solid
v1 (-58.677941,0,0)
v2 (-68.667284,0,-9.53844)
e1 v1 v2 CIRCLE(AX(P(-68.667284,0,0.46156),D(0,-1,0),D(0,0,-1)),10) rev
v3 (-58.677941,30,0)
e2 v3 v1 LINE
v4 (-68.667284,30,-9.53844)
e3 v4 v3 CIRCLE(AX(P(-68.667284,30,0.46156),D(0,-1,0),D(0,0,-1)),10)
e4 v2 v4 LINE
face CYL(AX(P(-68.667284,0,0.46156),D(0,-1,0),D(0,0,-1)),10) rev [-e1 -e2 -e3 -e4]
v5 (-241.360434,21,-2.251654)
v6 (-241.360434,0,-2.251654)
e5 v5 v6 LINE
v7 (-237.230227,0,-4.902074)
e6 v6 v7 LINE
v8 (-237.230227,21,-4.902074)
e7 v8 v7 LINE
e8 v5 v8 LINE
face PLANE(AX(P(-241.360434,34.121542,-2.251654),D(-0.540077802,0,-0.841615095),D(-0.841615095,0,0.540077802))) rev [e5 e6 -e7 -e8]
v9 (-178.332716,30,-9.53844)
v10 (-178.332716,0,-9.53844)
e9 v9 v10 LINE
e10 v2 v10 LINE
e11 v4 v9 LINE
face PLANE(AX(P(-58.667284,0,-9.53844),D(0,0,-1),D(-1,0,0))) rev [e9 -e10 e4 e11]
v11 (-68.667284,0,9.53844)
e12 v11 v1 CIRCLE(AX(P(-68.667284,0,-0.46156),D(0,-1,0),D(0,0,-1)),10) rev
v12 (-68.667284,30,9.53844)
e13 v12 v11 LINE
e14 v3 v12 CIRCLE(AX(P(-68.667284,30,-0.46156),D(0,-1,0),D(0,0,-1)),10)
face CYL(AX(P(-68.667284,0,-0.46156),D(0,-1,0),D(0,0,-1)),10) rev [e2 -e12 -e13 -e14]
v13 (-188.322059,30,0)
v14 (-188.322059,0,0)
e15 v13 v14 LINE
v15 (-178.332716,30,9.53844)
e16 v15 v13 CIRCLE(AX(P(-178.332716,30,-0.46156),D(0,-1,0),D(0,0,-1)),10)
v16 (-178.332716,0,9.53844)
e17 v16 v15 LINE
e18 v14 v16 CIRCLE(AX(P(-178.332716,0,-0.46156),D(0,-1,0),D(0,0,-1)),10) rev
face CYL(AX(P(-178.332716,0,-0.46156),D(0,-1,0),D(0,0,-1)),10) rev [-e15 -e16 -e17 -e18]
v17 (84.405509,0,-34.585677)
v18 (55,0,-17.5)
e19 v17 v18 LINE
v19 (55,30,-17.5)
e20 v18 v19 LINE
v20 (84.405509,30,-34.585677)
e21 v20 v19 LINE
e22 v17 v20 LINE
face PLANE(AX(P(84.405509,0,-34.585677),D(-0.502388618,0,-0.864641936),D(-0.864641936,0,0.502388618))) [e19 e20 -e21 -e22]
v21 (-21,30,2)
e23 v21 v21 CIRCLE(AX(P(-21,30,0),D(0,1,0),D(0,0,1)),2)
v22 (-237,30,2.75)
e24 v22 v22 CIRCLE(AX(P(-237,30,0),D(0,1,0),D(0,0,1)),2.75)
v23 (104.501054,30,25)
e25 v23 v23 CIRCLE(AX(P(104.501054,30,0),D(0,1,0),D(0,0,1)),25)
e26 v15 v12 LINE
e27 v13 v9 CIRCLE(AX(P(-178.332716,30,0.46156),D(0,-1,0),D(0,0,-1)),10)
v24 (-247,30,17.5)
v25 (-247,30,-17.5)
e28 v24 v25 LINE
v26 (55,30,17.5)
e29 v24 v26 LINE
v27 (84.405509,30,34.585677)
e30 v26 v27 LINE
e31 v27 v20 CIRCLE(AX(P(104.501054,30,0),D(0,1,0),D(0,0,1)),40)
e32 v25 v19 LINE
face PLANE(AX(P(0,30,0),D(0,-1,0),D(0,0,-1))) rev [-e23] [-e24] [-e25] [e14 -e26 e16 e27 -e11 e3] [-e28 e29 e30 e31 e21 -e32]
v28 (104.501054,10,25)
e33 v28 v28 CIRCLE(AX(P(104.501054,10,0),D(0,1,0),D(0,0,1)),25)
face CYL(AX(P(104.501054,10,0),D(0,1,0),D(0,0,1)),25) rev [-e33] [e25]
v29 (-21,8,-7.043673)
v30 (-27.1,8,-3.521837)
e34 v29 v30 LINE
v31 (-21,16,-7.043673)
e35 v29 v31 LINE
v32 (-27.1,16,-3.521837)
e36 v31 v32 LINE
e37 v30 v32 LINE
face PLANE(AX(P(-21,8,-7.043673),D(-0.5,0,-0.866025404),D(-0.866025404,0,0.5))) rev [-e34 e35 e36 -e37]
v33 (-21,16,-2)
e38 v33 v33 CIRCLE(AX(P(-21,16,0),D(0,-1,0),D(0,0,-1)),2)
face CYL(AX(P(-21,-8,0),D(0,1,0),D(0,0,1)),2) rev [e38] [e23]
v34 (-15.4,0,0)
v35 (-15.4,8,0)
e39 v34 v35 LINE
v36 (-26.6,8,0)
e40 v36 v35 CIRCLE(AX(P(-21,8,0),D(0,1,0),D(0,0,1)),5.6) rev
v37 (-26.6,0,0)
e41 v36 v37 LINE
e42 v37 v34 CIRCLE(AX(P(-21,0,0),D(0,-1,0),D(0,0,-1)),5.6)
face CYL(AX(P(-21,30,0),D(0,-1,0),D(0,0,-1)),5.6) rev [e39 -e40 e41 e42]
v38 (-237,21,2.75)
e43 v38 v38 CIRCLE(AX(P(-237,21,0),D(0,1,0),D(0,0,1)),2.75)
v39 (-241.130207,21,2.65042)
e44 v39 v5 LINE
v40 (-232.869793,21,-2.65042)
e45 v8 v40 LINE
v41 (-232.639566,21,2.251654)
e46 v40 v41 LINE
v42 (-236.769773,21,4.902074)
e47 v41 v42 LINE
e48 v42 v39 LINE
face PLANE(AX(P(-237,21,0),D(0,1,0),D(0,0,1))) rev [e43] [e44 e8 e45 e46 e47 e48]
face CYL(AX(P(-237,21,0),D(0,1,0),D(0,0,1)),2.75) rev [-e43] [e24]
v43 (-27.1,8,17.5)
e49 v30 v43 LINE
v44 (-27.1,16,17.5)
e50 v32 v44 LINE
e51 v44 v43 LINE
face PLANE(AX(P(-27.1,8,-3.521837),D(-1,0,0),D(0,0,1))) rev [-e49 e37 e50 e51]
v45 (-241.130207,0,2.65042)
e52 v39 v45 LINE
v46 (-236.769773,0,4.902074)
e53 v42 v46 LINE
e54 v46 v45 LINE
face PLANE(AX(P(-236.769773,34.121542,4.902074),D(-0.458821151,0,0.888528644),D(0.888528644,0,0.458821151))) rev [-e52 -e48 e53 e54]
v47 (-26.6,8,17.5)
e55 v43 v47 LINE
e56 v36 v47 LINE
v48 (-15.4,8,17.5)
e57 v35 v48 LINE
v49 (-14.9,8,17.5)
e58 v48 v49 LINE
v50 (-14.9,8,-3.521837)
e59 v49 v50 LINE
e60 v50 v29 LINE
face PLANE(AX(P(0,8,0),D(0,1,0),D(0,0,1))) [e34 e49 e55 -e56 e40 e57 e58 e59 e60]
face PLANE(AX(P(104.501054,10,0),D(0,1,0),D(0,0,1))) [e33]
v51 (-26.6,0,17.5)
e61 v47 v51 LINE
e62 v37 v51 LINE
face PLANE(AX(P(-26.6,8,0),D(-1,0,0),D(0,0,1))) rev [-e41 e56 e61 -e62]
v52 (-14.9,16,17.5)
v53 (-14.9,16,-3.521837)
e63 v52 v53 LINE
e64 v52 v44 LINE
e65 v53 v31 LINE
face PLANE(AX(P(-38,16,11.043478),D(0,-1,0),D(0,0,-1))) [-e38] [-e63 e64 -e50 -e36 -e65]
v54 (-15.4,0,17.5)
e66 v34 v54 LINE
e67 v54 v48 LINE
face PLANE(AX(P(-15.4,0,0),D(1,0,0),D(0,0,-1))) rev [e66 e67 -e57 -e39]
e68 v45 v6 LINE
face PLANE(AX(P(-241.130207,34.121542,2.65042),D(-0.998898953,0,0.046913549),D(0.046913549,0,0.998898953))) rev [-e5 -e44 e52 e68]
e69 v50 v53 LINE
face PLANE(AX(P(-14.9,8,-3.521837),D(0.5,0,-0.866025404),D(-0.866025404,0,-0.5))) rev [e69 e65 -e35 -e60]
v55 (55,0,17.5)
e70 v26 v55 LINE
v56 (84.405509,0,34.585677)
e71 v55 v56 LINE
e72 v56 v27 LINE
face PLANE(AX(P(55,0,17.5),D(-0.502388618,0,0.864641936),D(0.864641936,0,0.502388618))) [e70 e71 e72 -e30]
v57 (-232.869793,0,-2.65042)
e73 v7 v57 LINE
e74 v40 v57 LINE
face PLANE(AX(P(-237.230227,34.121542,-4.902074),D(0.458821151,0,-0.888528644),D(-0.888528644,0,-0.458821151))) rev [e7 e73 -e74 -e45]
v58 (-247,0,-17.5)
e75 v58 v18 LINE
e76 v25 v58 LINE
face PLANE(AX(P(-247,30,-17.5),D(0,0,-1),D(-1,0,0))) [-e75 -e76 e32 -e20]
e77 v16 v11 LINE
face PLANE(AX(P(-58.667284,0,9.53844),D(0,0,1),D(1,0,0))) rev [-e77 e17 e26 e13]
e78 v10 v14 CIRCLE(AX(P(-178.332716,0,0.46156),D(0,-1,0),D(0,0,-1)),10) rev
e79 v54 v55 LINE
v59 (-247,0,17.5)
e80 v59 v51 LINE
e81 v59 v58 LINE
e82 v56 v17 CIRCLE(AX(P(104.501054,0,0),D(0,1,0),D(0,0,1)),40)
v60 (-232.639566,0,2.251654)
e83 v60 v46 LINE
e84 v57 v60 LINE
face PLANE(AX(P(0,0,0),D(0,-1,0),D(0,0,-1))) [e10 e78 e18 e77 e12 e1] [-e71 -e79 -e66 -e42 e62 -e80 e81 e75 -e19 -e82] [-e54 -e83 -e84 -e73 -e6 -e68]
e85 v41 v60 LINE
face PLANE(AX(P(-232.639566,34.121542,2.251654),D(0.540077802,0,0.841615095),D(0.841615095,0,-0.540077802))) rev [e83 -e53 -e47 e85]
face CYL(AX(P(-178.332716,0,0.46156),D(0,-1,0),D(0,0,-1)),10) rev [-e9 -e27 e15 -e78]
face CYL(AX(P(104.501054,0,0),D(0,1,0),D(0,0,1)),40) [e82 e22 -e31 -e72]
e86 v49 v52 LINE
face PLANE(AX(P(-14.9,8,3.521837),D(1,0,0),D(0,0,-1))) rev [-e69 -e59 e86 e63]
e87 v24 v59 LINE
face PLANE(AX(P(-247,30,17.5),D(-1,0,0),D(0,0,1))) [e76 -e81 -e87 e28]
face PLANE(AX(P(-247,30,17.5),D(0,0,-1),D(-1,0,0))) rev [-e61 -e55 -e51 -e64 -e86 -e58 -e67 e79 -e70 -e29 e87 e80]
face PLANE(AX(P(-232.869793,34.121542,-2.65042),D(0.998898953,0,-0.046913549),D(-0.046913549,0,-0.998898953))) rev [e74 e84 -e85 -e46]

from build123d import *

# Parameters (mm, degrees)
SKETCH2_W           = 247
SKETCH2_H           = 35
BOSS_EXTRUDE1_DEPTH = 30
SKETCH3_R           = 5.6
CUT_EXTRUDE1_DEPTH  = 250.429849858
CUT_EXTRUDE2_DEPTH  = 22
SKETCH6_W           = 22.496439662
SKETCH6_H           = 14
BOSS_EXTRUDE3_DEPTH = 38
CUT_EXTRUDE4_DEPTH  = 17.5
SKETCH9_R           = 2
CUT_EXTRUDE5_DEPTH  = 38
SKETCH15_R          = 2.75
CUT_EXTRUDE10_DEPTH = 9
CUT_EXTRUDE11_DEPTH = 21
SKETCH17_W          = 129.66543269
SKETCH17_H          = 19.076880406
CUT_EXTRUDE12_DEPTH = 250.429849858
FILLET1_R           = 10
SKETCH19_W          = 35
SKETCH19_H          = 30
BOSS_EXTRUDE5_DEPTH = 55
BOSS_EXTRUDE4_DEPTH = 30
SKETCH21_R          = 25
CUT_EXTRUDE14_DEPTH = 20


with BuildPart() as part:
    # Sketch2 → Boss-Extrude1 (new body)
    with BuildSketch(Plane(origin=(0, 0, 0), x_dir=(1, 0, 0), z_dir=(0, 1, 0))):
        with Locations((-123.5, 0)):
            Rectangle(SKETCH2_W, SKETCH2_H)
    extrude(amount=BOSS_EXTRUDE1_DEPTH)

    # Sketch3 → Cut-Extrude1 (cut, through all)
    with BuildSketch(Plane.XZ):
        with Locations(Location((-21, 0, 0), (0, 0, 270))):
            Circle(SKETCH3_R)
    extrude(amount=-CUT_EXTRUDE1_DEPTH, mode=Mode.SUBTRACT)

    # Sketch4 → Cut-Extrude2 (cut)
    with BuildSketch(Plane(origin=(0, 30, 0), x_dir=(1, 0, 0), z_dir=(0, 1, 0))):
        Polygon((-14.9, 3.521836642), (-21, 7.043673284), (-27.1, 3.521836642), (-27.1, -3.521836642), (-21, -7.043673284), (-14.9, -3.521836642), align=None)
    extrude(amount=-CUT_EXTRUDE2_DEPTH, mode=Mode.SUBTRACT)

    # Sketch6 → Boss-Extrude3 (add)
    with BuildSketch(Plane(origin=(0, 0, 0), x_dir=(0, 0, -1), z_dir=(1, 0, 0))):
        with Locations((0.204742288, 23)):
            Rectangle(SKETCH6_W, SKETCH6_H)
    extrude(amount=-BOSS_EXTRUDE3_DEPTH)

    # Sketch7 → Cut-Extrude4 (cut)
    with BuildSketch(Plane.XY.offset(17.5)):
        Polygon((-21, 16), (-14.9, 16), (-14.9, 8), (-15.4, 8), (-15.4, 0), (-26.6, 0), (-26.6, 8), (-27.1, 8), (-27.1, 16), align=None)
    extrude(amount=-CUT_EXTRUDE4_DEPTH, mode=Mode.SUBTRACT)

    # Sketch9 → Cut-Extrude5 (cut)
    with BuildSketch(Plane(origin=(0, 30, 0), x_dir=(1, 0, 0), z_dir=(0, 1, 0))):
        with Locations(Location((-21, 0, 0), (0, 0, 270))):
            Circle(SKETCH9_R)
    extrude(amount=-CUT_EXTRUDE5_DEPTH, mode=Mode.SUBTRACT)

    # Sketch15 → Cut-Extrude10 (cut)
    with BuildSketch(Plane(origin=(0, 30, 0), x_dir=(1, 0, 0), z_dir=(0, 1, 0))):
        with Locations(Location((-237, 0, 0), (0, 0, 270))):
            Circle(SKETCH15_R)
    extrude(amount=-CUT_EXTRUDE10_DEPTH, mode=Mode.SUBTRACT)

    # Sketch16 → Cut-Extrude11 (cut)
    with BuildSketch(Plane.XZ):
        Polygon((-241.130206964, 2.650419546), (-241.36043414, -2.25165438), (-237.230227176, -4.902073926), (-232.869793036, -2.650419546), (-232.63956586, 2.25165438), (-236.769772824, 4.902073926), align=None)
    extrude(amount=-CUT_EXTRUDE11_DEPTH, mode=Mode.SUBTRACT)

    # Sketch17 → Cut-Extrude12 (cut, through all)
    with BuildSketch(Plane(origin=(0, 30, 0), x_dir=(1, 0, 0), z_dir=(0, 1, 0))):
        with Locations((-123.5, 0)):
            Rectangle(SKETCH17_W, SKETCH17_H)
    extrude(amount=-CUT_EXTRUDE12_DEPTH, mode=Mode.SUBTRACT)

    # Fillet1
    # the kernel refuses this fillet: 10 mm, written as the material it adds along each edge
    with BuildSketch(Plane(origin=(-58.667283655, 30, 9.538440203), x_dir=(0, 0, -1), z_dir=(0, -1, 0))) as fillet1_piece_1:
        with BuildLine():
            CenterArc((FILLET1_R, -FILLET1_R), FILLET1_R, 90, 90)
            Line((0, -FILLET1_R), (0, 0))
            Line((0, 0), (FILLET1_R, 0))
        make_face()
    extrude(amount=30)
    with BuildSketch(Plane(origin=(-58.667283655, 30, -9.538440203), x_dir=(0, 0, 1), z_dir=(0, -1, 0)), Plane(origin=(-188.332716345, 30, -9.538440203), x_dir=(1, 0, 0), z_dir=(0, -1, 0)), Plane(origin=(-188.332716345, 30, 9.538440203), x_dir=(0, 0, -1), z_dir=(0, -1, 0))) as fillet1_piece_2:
        with BuildLine():
            CenterArc((FILLET1_R, FILLET1_R), FILLET1_R, 180, 90)
            Line((0, FILLET1_R), (0, 0))
            Line((0, 0), (FILLET1_R, 0))
        make_face()
    extrude(amount=30)

    # Sketch19 → Boss-Extrude5 (add)
    with BuildSketch(Plane(origin=(0, 0, 0), x_dir=(0, 0, -1), z_dir=(1, 0, 0))):
        with Locations((0, 15)):
            Rectangle(SKETCH19_W, SKETCH19_H)
    extrude(amount=BOSS_EXTRUDE5_DEPTH)

    # Sketch18 → Boss-Extrude4 (add)
    with BuildSketch(Plane(origin=(0, 30, 0), x_dir=(1, 0, 0), z_dir=(0, 1, 0))):
        with BuildLine():
            Line((55, 17.5), (55, -17.5))
            Line((55, -17.5), (84.405509337, -34.58567742))
            ThreePointArc((84.405509337, -34.58567742), (144.501054052, 0), (84.405509337, 34.58567742))
            Line((84.405509337, 34.58567742), (55, 17.5))
        make_face()
    extrude(amount=-BOSS_EXTRUDE4_DEPTH)

    # Sketch21 → Cut-Extrude14 (cut)
    with BuildSketch(Plane(origin=(0, 30, 0), x_dir=(1, 0, 0), z_dir=(0, 1, 0))):
        with Locations(Location((104.501054052, 0, 0), (0, 0, 270))):
            Circle(SKETCH21_R)
    extrude(amount=-CUT_EXTRUDE14_DEPTH, mode=Mode.SUBTRACT)


solid = part.part
